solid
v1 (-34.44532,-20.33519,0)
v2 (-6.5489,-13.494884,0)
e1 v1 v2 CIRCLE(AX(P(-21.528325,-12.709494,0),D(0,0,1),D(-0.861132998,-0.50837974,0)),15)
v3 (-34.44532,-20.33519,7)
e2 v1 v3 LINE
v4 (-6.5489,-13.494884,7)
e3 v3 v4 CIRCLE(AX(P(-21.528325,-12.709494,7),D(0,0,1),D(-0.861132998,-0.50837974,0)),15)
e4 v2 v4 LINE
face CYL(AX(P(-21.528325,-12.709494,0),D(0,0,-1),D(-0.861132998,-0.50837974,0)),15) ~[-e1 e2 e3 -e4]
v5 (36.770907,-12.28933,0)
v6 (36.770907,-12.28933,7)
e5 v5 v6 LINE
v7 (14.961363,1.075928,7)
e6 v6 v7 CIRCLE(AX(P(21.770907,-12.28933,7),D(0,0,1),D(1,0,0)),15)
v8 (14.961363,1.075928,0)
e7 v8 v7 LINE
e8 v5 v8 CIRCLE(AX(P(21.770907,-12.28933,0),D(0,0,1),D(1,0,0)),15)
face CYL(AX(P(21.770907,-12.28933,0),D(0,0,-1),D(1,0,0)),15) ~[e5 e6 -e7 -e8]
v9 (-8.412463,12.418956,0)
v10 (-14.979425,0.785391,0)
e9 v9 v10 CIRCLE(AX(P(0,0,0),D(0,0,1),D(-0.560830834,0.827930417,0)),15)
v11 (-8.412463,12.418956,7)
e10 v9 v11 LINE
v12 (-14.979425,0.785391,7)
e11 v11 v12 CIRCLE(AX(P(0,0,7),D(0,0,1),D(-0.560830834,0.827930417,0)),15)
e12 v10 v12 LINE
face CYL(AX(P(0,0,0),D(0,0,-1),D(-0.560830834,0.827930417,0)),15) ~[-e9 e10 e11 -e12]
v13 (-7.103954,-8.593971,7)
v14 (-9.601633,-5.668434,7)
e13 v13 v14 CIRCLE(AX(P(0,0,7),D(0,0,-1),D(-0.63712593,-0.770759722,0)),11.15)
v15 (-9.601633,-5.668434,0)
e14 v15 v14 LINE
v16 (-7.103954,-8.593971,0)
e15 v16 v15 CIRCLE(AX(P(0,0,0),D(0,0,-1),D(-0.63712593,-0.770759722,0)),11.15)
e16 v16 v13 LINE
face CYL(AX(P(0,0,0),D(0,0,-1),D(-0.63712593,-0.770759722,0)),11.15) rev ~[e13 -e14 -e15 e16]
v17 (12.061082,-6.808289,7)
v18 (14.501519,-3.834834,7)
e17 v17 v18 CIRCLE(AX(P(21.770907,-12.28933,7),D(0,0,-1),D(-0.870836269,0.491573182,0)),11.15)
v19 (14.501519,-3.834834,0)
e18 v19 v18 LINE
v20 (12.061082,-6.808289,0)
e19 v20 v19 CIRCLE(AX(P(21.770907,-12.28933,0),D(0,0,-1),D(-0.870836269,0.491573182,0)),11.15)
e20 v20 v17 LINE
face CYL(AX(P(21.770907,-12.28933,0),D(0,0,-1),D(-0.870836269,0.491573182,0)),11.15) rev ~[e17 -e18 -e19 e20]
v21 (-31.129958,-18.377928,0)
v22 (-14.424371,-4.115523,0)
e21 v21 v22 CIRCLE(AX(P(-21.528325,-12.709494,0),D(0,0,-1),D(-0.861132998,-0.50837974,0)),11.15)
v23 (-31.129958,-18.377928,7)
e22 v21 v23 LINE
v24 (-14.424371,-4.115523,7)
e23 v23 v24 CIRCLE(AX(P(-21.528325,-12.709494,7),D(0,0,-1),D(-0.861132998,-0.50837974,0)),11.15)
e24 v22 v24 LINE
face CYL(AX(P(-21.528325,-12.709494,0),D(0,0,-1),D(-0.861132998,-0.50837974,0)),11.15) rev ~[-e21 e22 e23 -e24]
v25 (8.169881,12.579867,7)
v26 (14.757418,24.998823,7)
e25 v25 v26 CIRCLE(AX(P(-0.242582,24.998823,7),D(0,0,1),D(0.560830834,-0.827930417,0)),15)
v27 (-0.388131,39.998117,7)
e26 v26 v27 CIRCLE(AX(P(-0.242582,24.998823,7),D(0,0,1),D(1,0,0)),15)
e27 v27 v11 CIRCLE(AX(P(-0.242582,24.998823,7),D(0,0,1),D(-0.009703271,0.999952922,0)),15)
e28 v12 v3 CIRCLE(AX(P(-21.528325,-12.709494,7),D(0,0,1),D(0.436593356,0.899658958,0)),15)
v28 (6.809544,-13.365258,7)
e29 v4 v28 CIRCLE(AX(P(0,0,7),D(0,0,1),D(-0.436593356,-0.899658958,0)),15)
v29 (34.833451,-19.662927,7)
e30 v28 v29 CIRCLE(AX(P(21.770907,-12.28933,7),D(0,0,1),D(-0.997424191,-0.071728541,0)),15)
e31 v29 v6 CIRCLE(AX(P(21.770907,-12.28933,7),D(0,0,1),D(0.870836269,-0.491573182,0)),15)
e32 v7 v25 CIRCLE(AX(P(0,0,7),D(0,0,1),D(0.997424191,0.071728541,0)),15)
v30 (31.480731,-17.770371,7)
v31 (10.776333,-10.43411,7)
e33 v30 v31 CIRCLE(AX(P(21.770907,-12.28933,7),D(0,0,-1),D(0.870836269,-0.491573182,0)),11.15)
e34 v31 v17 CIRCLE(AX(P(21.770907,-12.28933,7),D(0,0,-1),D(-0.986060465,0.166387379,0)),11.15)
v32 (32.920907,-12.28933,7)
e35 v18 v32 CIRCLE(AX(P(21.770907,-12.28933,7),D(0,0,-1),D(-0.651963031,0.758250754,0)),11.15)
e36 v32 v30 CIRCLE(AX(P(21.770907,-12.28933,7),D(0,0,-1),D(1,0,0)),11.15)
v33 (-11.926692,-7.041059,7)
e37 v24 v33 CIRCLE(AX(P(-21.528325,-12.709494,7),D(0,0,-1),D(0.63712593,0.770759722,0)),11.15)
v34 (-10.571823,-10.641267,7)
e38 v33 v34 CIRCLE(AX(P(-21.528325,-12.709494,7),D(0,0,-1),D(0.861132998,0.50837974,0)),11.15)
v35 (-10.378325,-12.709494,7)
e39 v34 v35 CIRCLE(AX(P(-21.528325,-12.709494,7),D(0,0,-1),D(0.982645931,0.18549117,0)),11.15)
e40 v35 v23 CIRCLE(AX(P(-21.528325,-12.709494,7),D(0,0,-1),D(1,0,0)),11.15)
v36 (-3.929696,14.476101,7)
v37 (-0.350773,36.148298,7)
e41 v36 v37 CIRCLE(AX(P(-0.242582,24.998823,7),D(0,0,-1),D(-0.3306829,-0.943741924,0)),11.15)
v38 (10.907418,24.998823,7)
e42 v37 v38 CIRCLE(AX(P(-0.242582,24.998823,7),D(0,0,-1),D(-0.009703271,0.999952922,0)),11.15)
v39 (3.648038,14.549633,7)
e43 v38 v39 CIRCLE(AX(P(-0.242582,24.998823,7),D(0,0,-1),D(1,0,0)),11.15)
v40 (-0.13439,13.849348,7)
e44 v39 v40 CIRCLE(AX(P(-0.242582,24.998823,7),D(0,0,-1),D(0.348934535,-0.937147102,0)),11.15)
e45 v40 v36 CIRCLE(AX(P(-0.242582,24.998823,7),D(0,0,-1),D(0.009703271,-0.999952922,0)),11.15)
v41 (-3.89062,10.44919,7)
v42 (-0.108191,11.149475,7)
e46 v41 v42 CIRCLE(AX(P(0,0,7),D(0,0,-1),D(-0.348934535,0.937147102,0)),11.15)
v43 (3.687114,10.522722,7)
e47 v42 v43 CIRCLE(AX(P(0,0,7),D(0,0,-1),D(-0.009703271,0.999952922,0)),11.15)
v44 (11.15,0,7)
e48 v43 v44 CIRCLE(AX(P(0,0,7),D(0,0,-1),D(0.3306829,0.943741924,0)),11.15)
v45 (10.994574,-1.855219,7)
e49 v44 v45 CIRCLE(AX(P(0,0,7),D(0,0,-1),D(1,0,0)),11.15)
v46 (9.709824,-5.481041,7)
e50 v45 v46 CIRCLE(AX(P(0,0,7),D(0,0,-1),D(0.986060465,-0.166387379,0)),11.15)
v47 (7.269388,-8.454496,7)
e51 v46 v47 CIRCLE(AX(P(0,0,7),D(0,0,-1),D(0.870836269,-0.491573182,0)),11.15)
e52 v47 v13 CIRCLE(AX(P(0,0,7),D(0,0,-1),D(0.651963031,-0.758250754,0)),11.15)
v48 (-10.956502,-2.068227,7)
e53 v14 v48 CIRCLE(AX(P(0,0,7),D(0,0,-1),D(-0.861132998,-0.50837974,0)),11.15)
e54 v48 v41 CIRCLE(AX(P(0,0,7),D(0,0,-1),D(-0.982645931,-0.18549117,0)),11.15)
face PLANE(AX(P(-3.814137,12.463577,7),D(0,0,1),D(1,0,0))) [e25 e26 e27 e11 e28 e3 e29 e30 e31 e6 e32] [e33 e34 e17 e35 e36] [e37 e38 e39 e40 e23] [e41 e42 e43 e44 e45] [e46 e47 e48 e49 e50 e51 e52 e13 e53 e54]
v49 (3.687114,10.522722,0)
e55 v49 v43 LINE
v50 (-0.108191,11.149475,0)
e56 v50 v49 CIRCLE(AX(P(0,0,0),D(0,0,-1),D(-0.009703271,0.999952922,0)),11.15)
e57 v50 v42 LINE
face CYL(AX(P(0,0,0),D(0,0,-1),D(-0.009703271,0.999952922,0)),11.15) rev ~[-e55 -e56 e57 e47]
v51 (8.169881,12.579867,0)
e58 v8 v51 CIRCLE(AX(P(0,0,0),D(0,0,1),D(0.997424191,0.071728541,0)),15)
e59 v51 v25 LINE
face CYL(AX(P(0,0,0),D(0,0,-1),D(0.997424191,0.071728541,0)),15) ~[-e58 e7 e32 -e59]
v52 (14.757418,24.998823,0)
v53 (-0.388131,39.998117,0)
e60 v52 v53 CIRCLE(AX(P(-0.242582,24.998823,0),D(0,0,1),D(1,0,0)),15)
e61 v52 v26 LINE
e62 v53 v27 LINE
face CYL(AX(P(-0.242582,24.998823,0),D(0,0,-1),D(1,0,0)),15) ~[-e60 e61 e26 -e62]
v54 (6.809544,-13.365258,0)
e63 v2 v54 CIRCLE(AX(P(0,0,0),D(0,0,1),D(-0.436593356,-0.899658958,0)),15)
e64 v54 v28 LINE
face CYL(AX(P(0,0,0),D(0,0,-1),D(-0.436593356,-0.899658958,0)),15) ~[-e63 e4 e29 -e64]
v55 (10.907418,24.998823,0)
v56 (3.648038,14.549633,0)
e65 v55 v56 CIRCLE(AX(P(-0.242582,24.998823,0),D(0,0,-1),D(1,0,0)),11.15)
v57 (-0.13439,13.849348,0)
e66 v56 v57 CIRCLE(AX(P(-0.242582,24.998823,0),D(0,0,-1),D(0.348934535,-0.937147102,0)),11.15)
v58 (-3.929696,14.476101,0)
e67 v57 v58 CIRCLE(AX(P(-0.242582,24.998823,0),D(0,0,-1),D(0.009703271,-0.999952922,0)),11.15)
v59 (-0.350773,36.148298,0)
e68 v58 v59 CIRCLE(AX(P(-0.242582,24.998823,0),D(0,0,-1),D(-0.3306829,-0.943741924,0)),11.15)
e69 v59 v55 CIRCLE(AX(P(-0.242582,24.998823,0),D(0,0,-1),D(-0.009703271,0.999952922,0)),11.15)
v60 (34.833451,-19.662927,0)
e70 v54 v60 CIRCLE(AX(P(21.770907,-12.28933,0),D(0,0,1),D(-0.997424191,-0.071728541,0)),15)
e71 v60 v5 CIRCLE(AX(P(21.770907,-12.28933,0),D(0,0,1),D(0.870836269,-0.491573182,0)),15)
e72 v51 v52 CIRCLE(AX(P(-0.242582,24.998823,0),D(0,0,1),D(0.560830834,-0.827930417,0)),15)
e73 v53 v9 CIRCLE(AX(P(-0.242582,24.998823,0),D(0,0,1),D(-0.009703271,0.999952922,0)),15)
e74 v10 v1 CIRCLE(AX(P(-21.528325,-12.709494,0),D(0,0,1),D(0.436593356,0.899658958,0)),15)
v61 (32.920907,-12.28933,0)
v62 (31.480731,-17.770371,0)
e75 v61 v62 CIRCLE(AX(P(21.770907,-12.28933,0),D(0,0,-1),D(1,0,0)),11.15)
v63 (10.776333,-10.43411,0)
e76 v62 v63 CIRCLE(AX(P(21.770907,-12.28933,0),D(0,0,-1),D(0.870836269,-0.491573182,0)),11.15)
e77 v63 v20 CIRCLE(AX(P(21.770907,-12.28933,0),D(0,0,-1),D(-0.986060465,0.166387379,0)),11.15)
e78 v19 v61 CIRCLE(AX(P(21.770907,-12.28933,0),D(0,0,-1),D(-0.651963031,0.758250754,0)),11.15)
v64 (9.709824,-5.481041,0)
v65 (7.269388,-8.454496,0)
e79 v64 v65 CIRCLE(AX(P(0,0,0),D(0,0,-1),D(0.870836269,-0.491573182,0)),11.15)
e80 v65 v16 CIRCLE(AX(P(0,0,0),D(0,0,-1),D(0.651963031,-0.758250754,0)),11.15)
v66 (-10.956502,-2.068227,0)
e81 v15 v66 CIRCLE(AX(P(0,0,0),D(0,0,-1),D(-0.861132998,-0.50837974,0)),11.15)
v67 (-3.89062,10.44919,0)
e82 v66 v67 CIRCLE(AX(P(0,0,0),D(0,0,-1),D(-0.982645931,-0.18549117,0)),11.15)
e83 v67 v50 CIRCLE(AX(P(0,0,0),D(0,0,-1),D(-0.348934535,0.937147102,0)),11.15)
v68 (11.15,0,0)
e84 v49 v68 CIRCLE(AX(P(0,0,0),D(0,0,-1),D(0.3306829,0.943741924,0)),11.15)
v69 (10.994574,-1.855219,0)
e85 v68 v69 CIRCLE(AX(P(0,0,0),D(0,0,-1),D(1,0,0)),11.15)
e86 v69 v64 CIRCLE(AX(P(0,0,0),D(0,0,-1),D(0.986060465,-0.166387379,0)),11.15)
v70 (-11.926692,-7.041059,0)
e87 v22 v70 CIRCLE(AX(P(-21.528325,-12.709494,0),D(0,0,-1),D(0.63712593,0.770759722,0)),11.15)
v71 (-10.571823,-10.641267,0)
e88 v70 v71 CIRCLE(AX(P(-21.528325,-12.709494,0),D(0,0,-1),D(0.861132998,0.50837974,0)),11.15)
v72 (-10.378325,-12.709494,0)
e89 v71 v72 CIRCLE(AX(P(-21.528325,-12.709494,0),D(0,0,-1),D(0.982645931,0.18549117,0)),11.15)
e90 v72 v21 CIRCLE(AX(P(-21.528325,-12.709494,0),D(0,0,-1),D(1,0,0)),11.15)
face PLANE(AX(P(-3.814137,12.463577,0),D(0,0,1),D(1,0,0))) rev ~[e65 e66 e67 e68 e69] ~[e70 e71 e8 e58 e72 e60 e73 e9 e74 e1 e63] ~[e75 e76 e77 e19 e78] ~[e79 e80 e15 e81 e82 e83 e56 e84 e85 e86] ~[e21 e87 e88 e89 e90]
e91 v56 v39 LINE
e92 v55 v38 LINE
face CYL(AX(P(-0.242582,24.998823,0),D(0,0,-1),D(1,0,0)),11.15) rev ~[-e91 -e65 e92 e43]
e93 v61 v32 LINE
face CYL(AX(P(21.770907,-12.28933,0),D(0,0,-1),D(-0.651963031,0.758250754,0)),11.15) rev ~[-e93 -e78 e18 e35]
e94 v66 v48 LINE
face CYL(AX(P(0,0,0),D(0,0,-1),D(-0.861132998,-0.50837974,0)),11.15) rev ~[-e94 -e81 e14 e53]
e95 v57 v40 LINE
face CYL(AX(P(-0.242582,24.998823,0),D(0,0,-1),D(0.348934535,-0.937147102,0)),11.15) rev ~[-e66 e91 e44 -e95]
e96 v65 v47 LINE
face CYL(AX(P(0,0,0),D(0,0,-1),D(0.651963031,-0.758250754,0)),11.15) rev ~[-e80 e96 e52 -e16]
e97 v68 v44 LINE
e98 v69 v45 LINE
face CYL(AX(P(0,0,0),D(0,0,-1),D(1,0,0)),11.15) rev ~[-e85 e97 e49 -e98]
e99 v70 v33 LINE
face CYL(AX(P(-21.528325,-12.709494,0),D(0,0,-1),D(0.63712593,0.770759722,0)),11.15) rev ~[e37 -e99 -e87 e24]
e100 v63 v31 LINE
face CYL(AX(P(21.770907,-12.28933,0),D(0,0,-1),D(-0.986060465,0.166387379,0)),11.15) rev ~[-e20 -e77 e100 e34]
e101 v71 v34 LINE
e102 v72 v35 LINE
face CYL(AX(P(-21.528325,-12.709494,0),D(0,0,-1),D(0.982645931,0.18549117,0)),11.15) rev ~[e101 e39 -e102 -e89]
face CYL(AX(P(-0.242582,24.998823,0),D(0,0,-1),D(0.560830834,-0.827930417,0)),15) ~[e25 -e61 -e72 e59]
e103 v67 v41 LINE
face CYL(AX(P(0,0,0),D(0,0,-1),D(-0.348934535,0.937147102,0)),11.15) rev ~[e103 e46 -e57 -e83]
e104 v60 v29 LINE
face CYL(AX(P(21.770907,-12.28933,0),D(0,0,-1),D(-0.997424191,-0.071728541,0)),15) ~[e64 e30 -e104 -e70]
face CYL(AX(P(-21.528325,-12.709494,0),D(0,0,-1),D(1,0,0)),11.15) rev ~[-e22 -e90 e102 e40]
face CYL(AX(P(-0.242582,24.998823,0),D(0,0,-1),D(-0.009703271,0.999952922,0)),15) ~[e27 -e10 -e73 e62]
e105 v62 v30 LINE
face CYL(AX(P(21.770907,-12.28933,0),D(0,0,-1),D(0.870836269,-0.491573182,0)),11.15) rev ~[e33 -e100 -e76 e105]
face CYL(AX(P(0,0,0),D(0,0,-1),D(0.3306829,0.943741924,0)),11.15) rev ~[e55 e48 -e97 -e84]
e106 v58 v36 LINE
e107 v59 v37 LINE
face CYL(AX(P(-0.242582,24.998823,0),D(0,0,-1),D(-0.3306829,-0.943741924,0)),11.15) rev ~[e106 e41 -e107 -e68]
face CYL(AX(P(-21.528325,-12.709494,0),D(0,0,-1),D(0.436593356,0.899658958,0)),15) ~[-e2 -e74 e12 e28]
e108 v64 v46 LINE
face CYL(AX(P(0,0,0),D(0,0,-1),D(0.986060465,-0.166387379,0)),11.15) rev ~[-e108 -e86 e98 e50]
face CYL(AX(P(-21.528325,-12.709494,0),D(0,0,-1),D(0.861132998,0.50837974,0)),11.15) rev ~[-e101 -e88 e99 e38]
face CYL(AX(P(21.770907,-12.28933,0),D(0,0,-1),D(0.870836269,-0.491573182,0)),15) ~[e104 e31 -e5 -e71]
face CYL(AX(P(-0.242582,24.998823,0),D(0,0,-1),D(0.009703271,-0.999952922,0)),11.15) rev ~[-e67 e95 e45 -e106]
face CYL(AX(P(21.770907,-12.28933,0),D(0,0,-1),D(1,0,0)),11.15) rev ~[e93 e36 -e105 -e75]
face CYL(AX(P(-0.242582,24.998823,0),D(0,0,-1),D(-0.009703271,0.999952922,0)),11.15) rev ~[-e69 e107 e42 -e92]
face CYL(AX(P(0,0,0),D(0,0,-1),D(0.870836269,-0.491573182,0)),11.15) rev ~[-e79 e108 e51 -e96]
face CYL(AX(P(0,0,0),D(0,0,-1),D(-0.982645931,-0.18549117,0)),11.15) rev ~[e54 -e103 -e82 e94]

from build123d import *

# Parameters (mm, degrees)
F1_DEPTH = 7


with BuildPart() as f1:
    # F0 (on Top) → F1 (new body)
    with BuildSketch(Plane.XY):
        with BuildLine():
            ThreePointArc((-3.8906200654, 10.4491901843), (-2.0298332845, 10.9636798949), (-0.1081914722, 11.1494750821))
            Line((-0.1081914722, 11.1494750821), (-0.1343903041, 13.8493479719))
            ThreePointArc((-0.1343903041, 13.8493479719), (-2.0592757302, 13.9978175054), (-3.9296961082, 14.4761005971))
            ThreePointArc((-3.9296961082, 14.4761005971), (-6.2562113602, 13.6330414588), (-8.4124625152, 12.4189562537))
            ThreePointArc((-8.4124625152, 12.4189562537), (-6.2330573108, 11.2469430781), (-3.8906200654, 10.4491901843))
        make_face()
        with BuildLine():
            Line((-0.1343903041, 13.8493479719), (-0.1081914722, 11.1494750821))
            ThreePointArc((-0.1081914722, 11.1494750821), (1.8166939539, 11.0010055485), (3.6871143319, 10.5227224568))
            ThreePointArc((3.6871143319, 10.5227224568), (6.0136295839, 11.3657815952), (8.1698807389, 12.5798668003))
            ThreePointArc((8.1698807389, 12.5798668003), (5.9904755345, 13.7518799759), (3.648038289, 14.5496328697))
            ThreePointArc((3.648038289, 14.5496328697), (1.7872515082, 14.0351431591), (-0.1343903041, 13.8493479719))
        make_face()
        with BuildLine():
            ThreePointArc((-10.9565021305, -2.0682265504), (-9.709824396, 5.4810409776), (-3.8906200654, 10.4491901843))
            ThreePointArc((-3.8906200654, 10.4491901843), (-6.2330573108, 11.2469430781), (-8.4124625152, 12.4189562537))
            ThreePointArc((-8.4124625152, 12.4189562537), (-13.0625440306, 7.3735977277), (-14.9794245947, 0.7853908656))
            ThreePointArc((-14.9794245947, 0.7853908656), (-12.8498703872, -0.474934809), (-10.9565021305, -2.0682265504))
        make_face()
        with BuildLine():
            ThreePointArc((8.1698807389, 12.5798668003), (6.0136295839, 11.3657815952), (3.6871143319, 10.5227224568))
            ThreePointArc((3.6871143319, 10.5227224568), (9.0948838585, 6.4502393444), (11.15, 0))
            ThreePointArc((11.15, 0), (11.1110756032, -0.930859248), (10.9945741812, -1.8552192791))
            ThreePointArc((10.9945741812, -1.8552192791), (12.8566670759, -0.2254855646), (14.9613628618, 1.0759281197))
            ThreePointArc((14.9613628618, 1.0759281197), (12.9169949647, 7.6256961047), (8.1698807389, 12.5798668003))
        make_face()
        with BuildLine():
            ThreePointArc((10.9945741812, -1.8552192791), (10.5097419502, -3.7239527576), (9.709824396, -5.4810409776))
            Line((9.709824396, -5.4810409776), (12.0610823215, -6.8082885686))
            ThreePointArc((12.0610823215, -6.8082885686), (13.1521034224, -5.2155236569), (14.5015189189, -3.8348336397))
            ThreePointArc((14.5015189189, -3.8348336397), (14.87485771, -1.933548062), (15, 0))
            ThreePointArc((15, 0), (14.9903376034, 0.538310818), (14.9613628618, 1.0759281197))
            ThreePointArc((14.9613628618, 1.0759281197), (12.8566670759, -0.2254855646), (10.9945741812, -1.8552192791))
        make_face()
        with BuildLine():
            Line((12.0610823215, -6.8082885686), (9.709824396, -5.4810409776))
            ThreePointArc((9.709824396, -5.4810409776), (8.6188032952, -7.0738058892), (7.2693877987, -8.4544959065))
            ThreePointArc((7.2693877987, -8.4544959065), (6.8362408033, -10.8908467862), (6.8095438558, -13.3652576659))
            ThreePointArc((6.8095438558, -13.3652576659), (8.9142396416, -12.0638439816), (10.7763325364, -10.4341102671))
            ThreePointArc((10.7763325364, -10.4341102671), (11.2611647674, -8.5653767885), (12.0610823215, -6.8082885686))
        make_face()
        with BuildLine():
            ThreePointArc((6.8095438558, -13.3652576659), (6.8362408033, -10.8908467862), (7.2693877987, -8.4544959065))
            ThreePointArc((7.2693877987, -8.4544959065), (0.1081914722, -11.1494750821), (-7.1039541159, -8.5939709052))
            ThreePointArc((-7.1039541159, -8.5939709052), (-6.6729292484, -10.6317016968), (-6.5283249412, -12.7094935078))
            ThreePointArc((-6.5283249412, -12.7094935078), (-6.5334696748, -13.1023236743), (-6.5489003466, -13.4948843734))
            ThreePointArc((-6.5489003466, -13.4948843734), (0.1455490658, -14.9992938324), (6.8095438558, -13.3652576659))
        make_face()
        with BuildLine():
            ThreePointArc((-7.1039541159, -8.5939709052), (-8.4799086657, -7.2397271373), (-9.6016329238, -5.6684341045))
            Line((-9.6016329238, -5.6684341045), (-11.9266920175, -7.0410594033))
            ThreePointArc((-11.9266920175, -7.0410594033), (-11.0928276921, -8.7822938485), (-10.5718228107, -10.6412669574))
            ThreePointArc((-10.5718228107, -10.6412669574), (-8.678454554, -12.2345586988), (-6.5489003466, -13.4948843734))
            ThreePointArc((-6.5489003466, -13.4948843734), (-6.5334696748, -13.1023236743), (-6.5283249412, -12.7094935078))
            ThreePointArc((-6.5283249412, -12.7094935078), (-6.6729292484, -10.6317016968), (-7.1039541159, -8.5939709052))
        make_face()
        with BuildLine():
            Line((-11.9266920175, -7.0410594033), (-9.6016329238, -5.6684341045))
            ThreePointArc((-9.6016329238, -5.6684341045), (-10.4354972491, -3.9271996593), (-10.9565021305, -2.0682265504))
            ThreePointArc((-10.9565021305, -2.0682265504), (-12.8498703872, -0.474934809), (-14.9794245947, 0.7853908656))
            ThreePointArc((-14.9794245947, 0.7853908656), (-14.9047151761, -1.6880359943), (-14.4243708254, -4.1155226026))
            ThreePointArc((-14.4243708254, -4.1155226026), (-13.0484162756, -5.4697663705), (-11.9266920175, -7.0410594033))
        make_face()
        with BuildLine():
            ThreePointArc((-0.3881308421, 39.9981168863), (-14.6453286848, 29.1893935987), (-8.4124625152, 12.4189562537))
            ThreePointArc((-8.4124625152, 12.4189562537), (-6.2562113602, 13.6330414588), (-3.9296961082, 14.4761005971))
            ThreePointArc((-3.9296961082, 14.4761005971), (-11.2435873248, 26.8155170078), (-0.3507732486, 36.148298136))
            Line((-0.3507732486, 36.148298136), (-0.3881308421, 39.9981168863))
        make_face()
        with BuildLine():
            ThreePointArc((3.648038289, 14.5496328697), (5.9904755345, 13.7518799759), (8.1698807389, 12.5798668003))
            ThreePointArc((8.1698807389, 12.5798668003), (13.0085868085, 17.9698450958), (14.7574182237, 24.9988230539))
            ThreePointArc((14.7574182237, 24.9988230539), (10.3124351354, 35.6567599084), (-0.3881308421, 39.9981168863))
            Line((-0.3881308421, 39.9981168863), (-0.3507732486, 36.148298136))
            ThreePointArc((-0.3507732486, 36.148298136), (7.603314128, 32.9212227824), (10.9074182237, 24.9988230539))
            ThreePointArc((10.9074182237, 24.9988230539), (8.9144623354, 18.6371374962), (3.648038289, 14.5496328697))
        make_face()
        with BuildLine():
            ThreePointArc((36.7709067176, -12.2893295462), (29.6085352544, 0.5001809573), (14.9613628618, 1.0759281197))
            ThreePointArc((14.9613628618, 1.0759281197), (14.9903376034, 0.538310818), (15, 0))
            ThreePointArc((15, 0), (14.87485771, -1.933548062), (14.5015189189, -3.8348336397))
            ThreePointArc((14.5015189189, -3.8348336397), (26.4221875114, -2.1558164842), (32.9209067176, -12.2893295462))
            ThreePointArc((32.9209067176, -12.2893295462), (32.5548540936, -15.1228748506), (31.4807311136, -17.7703705237))
            Line((31.4807311136, -17.7703705237), (34.8334507481, -19.6629272739))
            ThreePointArc((34.8334507481, -19.6629272739), (36.2784592413, -16.1012739018), (36.7709067176, -12.2893295462))
        make_face()
        with BuildLine():
            ThreePointArc((10.7763325364, -10.4341102671), (8.9142396416, -12.0638439816), (6.8095438558, -13.3652576659))
            ThreePointArc((6.8095438558, -13.3652576659), (18.4820560276, -26.9243376138), (34.8334507481, -19.6629272739))
            Line((34.8334507481, -19.6629272739), (31.4807311136, -17.7703705237))
            ThreePointArc((31.4807311136, -17.7703705237), (18.04695396, -22.7990714963), (10.7763325364, -10.4341102671))
        make_face()
        with BuildLine():
            ThreePointArc((-14.4243708254, -4.1155226026), (-14.9047151761, -1.6880359943), (-14.9794245947, 0.7853908656))
            ThreePointArc((-14.9794245947, 0.7853908656), (-32.5581883674, -2.5437612272), (-34.445319906, -20.3351896124))
            Line((-34.445319906, -20.3351896124), (-31.129957865, -18.3779276122))
            ThreePointArc((-31.129957865, -18.3779276122), (-28.7680520785, -4.2295848421), (-14.4243708254, -4.1155226026))
        make_face()
        with BuildLine():
            ThreePointArc((-34.445319906, -20.3351896124), (-17.9560920351, -27.2779234872), (-6.5489003466, -13.4948843734))
            ThreePointArc((-6.5489003466, -13.4948843734), (-8.678454554, -12.2345586988), (-10.5718228107, -10.6412669574))
            ThreePointArc((-10.5718228107, -10.6412669574), (-10.4268048031, -11.6708643043), (-10.3783249412, -12.7094935078))
            ThreePointArc((-10.3783249412, -12.7094935078), (-18.5902734696, -23.4654385406), (-31.129957865, -18.3779276122))
            Line((-31.129957865, -18.3779276122), (-34.445319906, -20.3351896124))
        make_face()
    extrude(amount=F1_DEPTH)


solid = f1.part
